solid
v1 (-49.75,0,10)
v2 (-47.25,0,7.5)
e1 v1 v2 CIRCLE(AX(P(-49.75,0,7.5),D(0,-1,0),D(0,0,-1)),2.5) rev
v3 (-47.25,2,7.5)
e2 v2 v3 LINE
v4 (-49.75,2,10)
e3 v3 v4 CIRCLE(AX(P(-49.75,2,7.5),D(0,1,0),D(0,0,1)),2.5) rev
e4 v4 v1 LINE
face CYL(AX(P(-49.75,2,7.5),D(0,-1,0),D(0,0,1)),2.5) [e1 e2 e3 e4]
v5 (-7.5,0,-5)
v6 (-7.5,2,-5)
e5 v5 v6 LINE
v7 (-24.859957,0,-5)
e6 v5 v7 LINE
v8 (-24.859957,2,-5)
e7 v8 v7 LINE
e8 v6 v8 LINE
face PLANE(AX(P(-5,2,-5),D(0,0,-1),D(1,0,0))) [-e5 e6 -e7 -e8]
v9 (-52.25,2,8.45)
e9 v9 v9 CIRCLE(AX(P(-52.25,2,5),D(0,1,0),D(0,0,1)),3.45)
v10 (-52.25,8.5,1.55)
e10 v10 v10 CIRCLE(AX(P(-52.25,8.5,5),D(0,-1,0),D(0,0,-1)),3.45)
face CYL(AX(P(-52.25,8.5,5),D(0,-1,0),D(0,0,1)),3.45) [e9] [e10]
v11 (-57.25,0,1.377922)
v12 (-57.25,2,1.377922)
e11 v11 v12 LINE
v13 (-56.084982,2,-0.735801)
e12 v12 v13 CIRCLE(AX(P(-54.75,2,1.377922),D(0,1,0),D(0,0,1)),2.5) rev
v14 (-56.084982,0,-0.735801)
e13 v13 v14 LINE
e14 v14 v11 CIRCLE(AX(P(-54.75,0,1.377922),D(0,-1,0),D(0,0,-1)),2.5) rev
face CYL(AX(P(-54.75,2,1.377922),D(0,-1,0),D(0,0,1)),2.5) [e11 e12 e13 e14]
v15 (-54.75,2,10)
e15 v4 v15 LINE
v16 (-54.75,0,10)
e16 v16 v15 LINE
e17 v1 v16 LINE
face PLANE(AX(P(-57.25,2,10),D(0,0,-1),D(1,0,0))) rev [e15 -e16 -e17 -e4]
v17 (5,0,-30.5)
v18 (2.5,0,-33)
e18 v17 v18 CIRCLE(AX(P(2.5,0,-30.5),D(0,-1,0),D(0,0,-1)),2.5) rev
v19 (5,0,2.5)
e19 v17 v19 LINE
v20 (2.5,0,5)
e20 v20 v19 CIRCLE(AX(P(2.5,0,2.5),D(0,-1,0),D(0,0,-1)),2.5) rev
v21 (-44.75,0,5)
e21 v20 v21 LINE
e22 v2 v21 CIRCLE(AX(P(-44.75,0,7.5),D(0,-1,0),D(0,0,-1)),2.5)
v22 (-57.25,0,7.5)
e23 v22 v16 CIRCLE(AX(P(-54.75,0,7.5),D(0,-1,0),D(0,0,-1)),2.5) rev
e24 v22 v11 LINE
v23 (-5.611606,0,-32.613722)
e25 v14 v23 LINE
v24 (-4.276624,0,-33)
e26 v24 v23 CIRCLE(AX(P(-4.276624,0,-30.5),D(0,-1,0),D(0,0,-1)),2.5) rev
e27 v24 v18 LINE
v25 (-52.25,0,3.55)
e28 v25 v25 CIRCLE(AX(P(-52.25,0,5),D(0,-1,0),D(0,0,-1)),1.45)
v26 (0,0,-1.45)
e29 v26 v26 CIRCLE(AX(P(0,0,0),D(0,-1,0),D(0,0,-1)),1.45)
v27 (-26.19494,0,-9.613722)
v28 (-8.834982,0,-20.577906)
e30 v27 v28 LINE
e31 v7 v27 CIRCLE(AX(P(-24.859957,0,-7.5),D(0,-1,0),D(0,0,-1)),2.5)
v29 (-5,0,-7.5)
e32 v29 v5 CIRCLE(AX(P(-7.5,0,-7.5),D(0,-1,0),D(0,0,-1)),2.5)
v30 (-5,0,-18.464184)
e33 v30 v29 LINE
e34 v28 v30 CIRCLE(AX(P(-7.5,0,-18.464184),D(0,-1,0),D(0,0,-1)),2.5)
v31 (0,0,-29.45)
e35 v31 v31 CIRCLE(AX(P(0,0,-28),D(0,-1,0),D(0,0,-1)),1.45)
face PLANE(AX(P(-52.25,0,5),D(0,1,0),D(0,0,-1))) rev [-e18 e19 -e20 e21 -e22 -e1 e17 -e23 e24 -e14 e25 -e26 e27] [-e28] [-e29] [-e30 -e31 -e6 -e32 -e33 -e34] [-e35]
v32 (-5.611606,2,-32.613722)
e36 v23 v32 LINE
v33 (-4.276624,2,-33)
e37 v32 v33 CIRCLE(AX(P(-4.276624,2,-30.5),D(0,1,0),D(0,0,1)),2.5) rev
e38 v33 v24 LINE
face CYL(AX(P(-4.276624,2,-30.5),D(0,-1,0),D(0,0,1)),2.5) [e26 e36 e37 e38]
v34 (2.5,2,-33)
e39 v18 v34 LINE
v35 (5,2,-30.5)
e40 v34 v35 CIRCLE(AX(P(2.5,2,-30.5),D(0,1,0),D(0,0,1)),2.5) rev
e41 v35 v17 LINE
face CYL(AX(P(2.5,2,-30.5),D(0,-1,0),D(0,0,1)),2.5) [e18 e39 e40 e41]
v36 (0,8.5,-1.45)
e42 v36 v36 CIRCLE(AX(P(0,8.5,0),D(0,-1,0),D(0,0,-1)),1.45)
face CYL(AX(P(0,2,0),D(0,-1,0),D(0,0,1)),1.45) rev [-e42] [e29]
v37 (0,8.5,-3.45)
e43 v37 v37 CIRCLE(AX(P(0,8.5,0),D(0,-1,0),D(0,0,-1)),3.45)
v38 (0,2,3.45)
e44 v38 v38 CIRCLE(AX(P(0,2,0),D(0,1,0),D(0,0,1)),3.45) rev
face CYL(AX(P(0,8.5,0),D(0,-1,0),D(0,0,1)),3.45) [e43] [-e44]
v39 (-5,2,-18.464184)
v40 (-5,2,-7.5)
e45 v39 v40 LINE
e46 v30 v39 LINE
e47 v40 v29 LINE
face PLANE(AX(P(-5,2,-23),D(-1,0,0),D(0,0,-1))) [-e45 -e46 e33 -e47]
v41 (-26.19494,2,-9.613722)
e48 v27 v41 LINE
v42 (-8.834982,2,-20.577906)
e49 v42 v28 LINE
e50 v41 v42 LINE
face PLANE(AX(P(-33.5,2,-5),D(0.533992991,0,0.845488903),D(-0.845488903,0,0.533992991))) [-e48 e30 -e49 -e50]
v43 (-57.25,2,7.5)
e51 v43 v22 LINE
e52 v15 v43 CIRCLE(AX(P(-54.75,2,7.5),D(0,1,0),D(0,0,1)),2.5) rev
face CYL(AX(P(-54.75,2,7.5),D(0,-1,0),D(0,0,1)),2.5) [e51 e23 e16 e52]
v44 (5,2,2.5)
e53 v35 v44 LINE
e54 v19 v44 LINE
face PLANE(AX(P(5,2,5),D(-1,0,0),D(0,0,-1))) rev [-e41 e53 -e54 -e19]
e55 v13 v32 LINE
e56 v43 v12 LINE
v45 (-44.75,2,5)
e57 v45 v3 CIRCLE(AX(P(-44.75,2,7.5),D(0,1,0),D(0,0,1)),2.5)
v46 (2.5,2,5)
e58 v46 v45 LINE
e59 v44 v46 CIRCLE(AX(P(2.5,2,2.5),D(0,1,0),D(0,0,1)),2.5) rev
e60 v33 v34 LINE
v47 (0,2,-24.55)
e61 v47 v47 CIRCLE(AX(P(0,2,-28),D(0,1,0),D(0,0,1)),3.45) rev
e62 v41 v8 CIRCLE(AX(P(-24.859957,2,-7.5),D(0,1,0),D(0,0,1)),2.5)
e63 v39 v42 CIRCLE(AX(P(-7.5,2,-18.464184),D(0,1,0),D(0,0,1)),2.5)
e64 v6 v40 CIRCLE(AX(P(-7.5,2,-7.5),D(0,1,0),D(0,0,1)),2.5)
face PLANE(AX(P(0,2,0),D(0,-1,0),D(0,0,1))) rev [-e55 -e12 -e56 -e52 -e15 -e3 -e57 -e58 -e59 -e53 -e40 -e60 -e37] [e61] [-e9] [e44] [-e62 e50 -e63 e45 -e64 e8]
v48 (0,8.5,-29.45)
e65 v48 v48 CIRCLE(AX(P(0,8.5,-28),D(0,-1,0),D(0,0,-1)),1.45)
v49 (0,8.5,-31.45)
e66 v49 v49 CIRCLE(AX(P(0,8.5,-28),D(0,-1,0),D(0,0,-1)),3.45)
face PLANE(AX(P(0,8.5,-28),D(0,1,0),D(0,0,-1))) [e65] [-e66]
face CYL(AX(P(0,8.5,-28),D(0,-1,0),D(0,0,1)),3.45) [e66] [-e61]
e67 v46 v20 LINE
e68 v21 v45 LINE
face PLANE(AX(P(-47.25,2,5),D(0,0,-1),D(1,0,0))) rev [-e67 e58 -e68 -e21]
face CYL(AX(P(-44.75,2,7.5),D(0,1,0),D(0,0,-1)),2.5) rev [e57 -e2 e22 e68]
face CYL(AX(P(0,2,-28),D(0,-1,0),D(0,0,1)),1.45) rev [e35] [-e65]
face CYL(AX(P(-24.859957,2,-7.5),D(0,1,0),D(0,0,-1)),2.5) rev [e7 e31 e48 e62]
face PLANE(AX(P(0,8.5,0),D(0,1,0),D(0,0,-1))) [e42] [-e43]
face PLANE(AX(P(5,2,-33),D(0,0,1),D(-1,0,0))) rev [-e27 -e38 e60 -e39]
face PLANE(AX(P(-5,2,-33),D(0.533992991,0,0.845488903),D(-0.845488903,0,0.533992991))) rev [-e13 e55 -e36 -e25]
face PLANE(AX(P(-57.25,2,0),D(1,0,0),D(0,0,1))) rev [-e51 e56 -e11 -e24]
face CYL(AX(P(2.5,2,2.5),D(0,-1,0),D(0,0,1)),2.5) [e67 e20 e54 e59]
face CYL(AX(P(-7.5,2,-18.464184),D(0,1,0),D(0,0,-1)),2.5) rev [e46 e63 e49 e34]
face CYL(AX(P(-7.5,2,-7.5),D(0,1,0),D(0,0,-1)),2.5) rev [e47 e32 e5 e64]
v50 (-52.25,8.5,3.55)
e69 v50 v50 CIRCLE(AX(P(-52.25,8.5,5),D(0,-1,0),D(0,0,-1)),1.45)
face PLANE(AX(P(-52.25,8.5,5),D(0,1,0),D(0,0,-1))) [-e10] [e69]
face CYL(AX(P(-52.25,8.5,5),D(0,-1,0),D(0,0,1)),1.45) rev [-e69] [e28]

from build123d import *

# Parameters (mm, degrees)
SKETCH1_R             = 3.45
SKETCH1_R_2           = 1.45
BOSS_EXTRUDE1_DEPTH   = 8.5
BOSS_EXTRUDE1_2_DEPTH = 8.5
BOSS_EXTRUDE1_3_DEPTH = 8.5
SKETCH2_R             = 1.45
BOSS_EXTRUDE2_DEPTH   = 2
FILLET2_R             = 2.5


with BuildPart() as part:
    # Sketch1 → Boss-Extrude1 (new body)
    with BuildSketch(Plane(origin=(0, 0, 0), x_dir=(1, 0, 0), z_dir=(0, 1, 0))):
        with Locations(Location((-52.25, 5, 0), (0, 0, 270))):
            Circle(SKETCH1_R)
        with Locations(Location((-52.25, 5, 0), (0, 0, 270))):
            Circle(SKETCH1_R_2, mode=Mode.SUBTRACT)
    extrude(amount=BOSS_EXTRUDE1_DEPTH)



with BuildPart() as body_2:
    # Sketch1 → Boss-Extrude1 2 (new body)
    with BuildSketch(Plane(origin=(0, 0, 0), x_dir=(1, 0, 0), z_dir=(0, 1, 0))):
        with Locations(Location((0, 0, 0), (0, 0, 270))):
            Circle(SKETCH1_R)
        with Locations(Location((0, 0, 0), (0, 0, 270))):
            Circle(SKETCH1_R_2, mode=Mode.SUBTRACT)
    extrude(amount=BOSS_EXTRUDE1_2_DEPTH)


with BuildPart() as body_3:
    # Sketch1 → Boss-Extrude1 3 (new body)
    with BuildSketch(Plane(origin=(0, 0, 0), x_dir=(1, 0, 0), z_dir=(0, 1, 0))):
        with Locations(Location((0, -28, 0), (0, 0, 270))):
            Circle(SKETCH1_R)
        with Locations(Location((0, -28, 0), (0, 0, 270))):
            Circle(SKETCH1_R_2, mode=Mode.SUBTRACT)
    extrude(amount=BOSS_EXTRUDE1_3_DEPTH)


with BuildPart() as part_1:
    add(part.part)

    add(body_2.part)  # Boss-Extrude2 merges body 2

    add(body_3.part)  # Boss-Extrude2 merges body 3
    # Sketch2 → Boss-Extrude2 (add)
    with BuildSketch(Plane(origin=(0, 0, 0), x_dir=(1, 0, 0), z_dir=(0, 1, 0))):
        Polygon((5, 5), (5, -33), (-5, -33), (-57.25, 0), (-57.25, 10), (-47.25, 10), (-47.25, 5), align=None)
        with Locations(Location((-52.25, 5, 0), (0, 0, 270))):
            Circle(SKETCH2_R, mode=Mode.SUBTRACT)
        with Locations(Location((0, -28, 0), (0, 0, 270))):
            Circle(SKETCH2_R, mode=Mode.SUBTRACT)
        with Locations(Location((0, 0, 0), (0, 0, 270))):
            Circle(SKETCH2_R, mode=Mode.SUBTRACT)
        Polygon((-33.5, -5), (-5, -23), (-5, -5), align=None, mode=Mode.SUBTRACT)
    extrude(amount=BOSS_EXTRUDE2_DEPTH)

    # Fillet2
    fillet2_edges = [part_1.edges().sort_by_distance(p)[0] for p in [
        (-5, 1, 33),
        (-57.25, 1, 0),
        (-57.25, 1, -10),
        (-47.25, 1, -5),
        (5, 1, -5),
        (5, 1, 33),
        (-47.25, 1, -10),
        (-33.5, 1, 5),
        (-5, 1, 5),
        (-5, 1, 23),
    ]]
    fillet(fillet2_edges, radius=FILLET2_R - 0.0001)  # a hair under: the kernel refuses the full size


with BuildPart() as body_2_2:
    # Mirror1: mirrored copy
    add(part_1.part.mirror(Plane.XY))


solid = body_2_2.part
